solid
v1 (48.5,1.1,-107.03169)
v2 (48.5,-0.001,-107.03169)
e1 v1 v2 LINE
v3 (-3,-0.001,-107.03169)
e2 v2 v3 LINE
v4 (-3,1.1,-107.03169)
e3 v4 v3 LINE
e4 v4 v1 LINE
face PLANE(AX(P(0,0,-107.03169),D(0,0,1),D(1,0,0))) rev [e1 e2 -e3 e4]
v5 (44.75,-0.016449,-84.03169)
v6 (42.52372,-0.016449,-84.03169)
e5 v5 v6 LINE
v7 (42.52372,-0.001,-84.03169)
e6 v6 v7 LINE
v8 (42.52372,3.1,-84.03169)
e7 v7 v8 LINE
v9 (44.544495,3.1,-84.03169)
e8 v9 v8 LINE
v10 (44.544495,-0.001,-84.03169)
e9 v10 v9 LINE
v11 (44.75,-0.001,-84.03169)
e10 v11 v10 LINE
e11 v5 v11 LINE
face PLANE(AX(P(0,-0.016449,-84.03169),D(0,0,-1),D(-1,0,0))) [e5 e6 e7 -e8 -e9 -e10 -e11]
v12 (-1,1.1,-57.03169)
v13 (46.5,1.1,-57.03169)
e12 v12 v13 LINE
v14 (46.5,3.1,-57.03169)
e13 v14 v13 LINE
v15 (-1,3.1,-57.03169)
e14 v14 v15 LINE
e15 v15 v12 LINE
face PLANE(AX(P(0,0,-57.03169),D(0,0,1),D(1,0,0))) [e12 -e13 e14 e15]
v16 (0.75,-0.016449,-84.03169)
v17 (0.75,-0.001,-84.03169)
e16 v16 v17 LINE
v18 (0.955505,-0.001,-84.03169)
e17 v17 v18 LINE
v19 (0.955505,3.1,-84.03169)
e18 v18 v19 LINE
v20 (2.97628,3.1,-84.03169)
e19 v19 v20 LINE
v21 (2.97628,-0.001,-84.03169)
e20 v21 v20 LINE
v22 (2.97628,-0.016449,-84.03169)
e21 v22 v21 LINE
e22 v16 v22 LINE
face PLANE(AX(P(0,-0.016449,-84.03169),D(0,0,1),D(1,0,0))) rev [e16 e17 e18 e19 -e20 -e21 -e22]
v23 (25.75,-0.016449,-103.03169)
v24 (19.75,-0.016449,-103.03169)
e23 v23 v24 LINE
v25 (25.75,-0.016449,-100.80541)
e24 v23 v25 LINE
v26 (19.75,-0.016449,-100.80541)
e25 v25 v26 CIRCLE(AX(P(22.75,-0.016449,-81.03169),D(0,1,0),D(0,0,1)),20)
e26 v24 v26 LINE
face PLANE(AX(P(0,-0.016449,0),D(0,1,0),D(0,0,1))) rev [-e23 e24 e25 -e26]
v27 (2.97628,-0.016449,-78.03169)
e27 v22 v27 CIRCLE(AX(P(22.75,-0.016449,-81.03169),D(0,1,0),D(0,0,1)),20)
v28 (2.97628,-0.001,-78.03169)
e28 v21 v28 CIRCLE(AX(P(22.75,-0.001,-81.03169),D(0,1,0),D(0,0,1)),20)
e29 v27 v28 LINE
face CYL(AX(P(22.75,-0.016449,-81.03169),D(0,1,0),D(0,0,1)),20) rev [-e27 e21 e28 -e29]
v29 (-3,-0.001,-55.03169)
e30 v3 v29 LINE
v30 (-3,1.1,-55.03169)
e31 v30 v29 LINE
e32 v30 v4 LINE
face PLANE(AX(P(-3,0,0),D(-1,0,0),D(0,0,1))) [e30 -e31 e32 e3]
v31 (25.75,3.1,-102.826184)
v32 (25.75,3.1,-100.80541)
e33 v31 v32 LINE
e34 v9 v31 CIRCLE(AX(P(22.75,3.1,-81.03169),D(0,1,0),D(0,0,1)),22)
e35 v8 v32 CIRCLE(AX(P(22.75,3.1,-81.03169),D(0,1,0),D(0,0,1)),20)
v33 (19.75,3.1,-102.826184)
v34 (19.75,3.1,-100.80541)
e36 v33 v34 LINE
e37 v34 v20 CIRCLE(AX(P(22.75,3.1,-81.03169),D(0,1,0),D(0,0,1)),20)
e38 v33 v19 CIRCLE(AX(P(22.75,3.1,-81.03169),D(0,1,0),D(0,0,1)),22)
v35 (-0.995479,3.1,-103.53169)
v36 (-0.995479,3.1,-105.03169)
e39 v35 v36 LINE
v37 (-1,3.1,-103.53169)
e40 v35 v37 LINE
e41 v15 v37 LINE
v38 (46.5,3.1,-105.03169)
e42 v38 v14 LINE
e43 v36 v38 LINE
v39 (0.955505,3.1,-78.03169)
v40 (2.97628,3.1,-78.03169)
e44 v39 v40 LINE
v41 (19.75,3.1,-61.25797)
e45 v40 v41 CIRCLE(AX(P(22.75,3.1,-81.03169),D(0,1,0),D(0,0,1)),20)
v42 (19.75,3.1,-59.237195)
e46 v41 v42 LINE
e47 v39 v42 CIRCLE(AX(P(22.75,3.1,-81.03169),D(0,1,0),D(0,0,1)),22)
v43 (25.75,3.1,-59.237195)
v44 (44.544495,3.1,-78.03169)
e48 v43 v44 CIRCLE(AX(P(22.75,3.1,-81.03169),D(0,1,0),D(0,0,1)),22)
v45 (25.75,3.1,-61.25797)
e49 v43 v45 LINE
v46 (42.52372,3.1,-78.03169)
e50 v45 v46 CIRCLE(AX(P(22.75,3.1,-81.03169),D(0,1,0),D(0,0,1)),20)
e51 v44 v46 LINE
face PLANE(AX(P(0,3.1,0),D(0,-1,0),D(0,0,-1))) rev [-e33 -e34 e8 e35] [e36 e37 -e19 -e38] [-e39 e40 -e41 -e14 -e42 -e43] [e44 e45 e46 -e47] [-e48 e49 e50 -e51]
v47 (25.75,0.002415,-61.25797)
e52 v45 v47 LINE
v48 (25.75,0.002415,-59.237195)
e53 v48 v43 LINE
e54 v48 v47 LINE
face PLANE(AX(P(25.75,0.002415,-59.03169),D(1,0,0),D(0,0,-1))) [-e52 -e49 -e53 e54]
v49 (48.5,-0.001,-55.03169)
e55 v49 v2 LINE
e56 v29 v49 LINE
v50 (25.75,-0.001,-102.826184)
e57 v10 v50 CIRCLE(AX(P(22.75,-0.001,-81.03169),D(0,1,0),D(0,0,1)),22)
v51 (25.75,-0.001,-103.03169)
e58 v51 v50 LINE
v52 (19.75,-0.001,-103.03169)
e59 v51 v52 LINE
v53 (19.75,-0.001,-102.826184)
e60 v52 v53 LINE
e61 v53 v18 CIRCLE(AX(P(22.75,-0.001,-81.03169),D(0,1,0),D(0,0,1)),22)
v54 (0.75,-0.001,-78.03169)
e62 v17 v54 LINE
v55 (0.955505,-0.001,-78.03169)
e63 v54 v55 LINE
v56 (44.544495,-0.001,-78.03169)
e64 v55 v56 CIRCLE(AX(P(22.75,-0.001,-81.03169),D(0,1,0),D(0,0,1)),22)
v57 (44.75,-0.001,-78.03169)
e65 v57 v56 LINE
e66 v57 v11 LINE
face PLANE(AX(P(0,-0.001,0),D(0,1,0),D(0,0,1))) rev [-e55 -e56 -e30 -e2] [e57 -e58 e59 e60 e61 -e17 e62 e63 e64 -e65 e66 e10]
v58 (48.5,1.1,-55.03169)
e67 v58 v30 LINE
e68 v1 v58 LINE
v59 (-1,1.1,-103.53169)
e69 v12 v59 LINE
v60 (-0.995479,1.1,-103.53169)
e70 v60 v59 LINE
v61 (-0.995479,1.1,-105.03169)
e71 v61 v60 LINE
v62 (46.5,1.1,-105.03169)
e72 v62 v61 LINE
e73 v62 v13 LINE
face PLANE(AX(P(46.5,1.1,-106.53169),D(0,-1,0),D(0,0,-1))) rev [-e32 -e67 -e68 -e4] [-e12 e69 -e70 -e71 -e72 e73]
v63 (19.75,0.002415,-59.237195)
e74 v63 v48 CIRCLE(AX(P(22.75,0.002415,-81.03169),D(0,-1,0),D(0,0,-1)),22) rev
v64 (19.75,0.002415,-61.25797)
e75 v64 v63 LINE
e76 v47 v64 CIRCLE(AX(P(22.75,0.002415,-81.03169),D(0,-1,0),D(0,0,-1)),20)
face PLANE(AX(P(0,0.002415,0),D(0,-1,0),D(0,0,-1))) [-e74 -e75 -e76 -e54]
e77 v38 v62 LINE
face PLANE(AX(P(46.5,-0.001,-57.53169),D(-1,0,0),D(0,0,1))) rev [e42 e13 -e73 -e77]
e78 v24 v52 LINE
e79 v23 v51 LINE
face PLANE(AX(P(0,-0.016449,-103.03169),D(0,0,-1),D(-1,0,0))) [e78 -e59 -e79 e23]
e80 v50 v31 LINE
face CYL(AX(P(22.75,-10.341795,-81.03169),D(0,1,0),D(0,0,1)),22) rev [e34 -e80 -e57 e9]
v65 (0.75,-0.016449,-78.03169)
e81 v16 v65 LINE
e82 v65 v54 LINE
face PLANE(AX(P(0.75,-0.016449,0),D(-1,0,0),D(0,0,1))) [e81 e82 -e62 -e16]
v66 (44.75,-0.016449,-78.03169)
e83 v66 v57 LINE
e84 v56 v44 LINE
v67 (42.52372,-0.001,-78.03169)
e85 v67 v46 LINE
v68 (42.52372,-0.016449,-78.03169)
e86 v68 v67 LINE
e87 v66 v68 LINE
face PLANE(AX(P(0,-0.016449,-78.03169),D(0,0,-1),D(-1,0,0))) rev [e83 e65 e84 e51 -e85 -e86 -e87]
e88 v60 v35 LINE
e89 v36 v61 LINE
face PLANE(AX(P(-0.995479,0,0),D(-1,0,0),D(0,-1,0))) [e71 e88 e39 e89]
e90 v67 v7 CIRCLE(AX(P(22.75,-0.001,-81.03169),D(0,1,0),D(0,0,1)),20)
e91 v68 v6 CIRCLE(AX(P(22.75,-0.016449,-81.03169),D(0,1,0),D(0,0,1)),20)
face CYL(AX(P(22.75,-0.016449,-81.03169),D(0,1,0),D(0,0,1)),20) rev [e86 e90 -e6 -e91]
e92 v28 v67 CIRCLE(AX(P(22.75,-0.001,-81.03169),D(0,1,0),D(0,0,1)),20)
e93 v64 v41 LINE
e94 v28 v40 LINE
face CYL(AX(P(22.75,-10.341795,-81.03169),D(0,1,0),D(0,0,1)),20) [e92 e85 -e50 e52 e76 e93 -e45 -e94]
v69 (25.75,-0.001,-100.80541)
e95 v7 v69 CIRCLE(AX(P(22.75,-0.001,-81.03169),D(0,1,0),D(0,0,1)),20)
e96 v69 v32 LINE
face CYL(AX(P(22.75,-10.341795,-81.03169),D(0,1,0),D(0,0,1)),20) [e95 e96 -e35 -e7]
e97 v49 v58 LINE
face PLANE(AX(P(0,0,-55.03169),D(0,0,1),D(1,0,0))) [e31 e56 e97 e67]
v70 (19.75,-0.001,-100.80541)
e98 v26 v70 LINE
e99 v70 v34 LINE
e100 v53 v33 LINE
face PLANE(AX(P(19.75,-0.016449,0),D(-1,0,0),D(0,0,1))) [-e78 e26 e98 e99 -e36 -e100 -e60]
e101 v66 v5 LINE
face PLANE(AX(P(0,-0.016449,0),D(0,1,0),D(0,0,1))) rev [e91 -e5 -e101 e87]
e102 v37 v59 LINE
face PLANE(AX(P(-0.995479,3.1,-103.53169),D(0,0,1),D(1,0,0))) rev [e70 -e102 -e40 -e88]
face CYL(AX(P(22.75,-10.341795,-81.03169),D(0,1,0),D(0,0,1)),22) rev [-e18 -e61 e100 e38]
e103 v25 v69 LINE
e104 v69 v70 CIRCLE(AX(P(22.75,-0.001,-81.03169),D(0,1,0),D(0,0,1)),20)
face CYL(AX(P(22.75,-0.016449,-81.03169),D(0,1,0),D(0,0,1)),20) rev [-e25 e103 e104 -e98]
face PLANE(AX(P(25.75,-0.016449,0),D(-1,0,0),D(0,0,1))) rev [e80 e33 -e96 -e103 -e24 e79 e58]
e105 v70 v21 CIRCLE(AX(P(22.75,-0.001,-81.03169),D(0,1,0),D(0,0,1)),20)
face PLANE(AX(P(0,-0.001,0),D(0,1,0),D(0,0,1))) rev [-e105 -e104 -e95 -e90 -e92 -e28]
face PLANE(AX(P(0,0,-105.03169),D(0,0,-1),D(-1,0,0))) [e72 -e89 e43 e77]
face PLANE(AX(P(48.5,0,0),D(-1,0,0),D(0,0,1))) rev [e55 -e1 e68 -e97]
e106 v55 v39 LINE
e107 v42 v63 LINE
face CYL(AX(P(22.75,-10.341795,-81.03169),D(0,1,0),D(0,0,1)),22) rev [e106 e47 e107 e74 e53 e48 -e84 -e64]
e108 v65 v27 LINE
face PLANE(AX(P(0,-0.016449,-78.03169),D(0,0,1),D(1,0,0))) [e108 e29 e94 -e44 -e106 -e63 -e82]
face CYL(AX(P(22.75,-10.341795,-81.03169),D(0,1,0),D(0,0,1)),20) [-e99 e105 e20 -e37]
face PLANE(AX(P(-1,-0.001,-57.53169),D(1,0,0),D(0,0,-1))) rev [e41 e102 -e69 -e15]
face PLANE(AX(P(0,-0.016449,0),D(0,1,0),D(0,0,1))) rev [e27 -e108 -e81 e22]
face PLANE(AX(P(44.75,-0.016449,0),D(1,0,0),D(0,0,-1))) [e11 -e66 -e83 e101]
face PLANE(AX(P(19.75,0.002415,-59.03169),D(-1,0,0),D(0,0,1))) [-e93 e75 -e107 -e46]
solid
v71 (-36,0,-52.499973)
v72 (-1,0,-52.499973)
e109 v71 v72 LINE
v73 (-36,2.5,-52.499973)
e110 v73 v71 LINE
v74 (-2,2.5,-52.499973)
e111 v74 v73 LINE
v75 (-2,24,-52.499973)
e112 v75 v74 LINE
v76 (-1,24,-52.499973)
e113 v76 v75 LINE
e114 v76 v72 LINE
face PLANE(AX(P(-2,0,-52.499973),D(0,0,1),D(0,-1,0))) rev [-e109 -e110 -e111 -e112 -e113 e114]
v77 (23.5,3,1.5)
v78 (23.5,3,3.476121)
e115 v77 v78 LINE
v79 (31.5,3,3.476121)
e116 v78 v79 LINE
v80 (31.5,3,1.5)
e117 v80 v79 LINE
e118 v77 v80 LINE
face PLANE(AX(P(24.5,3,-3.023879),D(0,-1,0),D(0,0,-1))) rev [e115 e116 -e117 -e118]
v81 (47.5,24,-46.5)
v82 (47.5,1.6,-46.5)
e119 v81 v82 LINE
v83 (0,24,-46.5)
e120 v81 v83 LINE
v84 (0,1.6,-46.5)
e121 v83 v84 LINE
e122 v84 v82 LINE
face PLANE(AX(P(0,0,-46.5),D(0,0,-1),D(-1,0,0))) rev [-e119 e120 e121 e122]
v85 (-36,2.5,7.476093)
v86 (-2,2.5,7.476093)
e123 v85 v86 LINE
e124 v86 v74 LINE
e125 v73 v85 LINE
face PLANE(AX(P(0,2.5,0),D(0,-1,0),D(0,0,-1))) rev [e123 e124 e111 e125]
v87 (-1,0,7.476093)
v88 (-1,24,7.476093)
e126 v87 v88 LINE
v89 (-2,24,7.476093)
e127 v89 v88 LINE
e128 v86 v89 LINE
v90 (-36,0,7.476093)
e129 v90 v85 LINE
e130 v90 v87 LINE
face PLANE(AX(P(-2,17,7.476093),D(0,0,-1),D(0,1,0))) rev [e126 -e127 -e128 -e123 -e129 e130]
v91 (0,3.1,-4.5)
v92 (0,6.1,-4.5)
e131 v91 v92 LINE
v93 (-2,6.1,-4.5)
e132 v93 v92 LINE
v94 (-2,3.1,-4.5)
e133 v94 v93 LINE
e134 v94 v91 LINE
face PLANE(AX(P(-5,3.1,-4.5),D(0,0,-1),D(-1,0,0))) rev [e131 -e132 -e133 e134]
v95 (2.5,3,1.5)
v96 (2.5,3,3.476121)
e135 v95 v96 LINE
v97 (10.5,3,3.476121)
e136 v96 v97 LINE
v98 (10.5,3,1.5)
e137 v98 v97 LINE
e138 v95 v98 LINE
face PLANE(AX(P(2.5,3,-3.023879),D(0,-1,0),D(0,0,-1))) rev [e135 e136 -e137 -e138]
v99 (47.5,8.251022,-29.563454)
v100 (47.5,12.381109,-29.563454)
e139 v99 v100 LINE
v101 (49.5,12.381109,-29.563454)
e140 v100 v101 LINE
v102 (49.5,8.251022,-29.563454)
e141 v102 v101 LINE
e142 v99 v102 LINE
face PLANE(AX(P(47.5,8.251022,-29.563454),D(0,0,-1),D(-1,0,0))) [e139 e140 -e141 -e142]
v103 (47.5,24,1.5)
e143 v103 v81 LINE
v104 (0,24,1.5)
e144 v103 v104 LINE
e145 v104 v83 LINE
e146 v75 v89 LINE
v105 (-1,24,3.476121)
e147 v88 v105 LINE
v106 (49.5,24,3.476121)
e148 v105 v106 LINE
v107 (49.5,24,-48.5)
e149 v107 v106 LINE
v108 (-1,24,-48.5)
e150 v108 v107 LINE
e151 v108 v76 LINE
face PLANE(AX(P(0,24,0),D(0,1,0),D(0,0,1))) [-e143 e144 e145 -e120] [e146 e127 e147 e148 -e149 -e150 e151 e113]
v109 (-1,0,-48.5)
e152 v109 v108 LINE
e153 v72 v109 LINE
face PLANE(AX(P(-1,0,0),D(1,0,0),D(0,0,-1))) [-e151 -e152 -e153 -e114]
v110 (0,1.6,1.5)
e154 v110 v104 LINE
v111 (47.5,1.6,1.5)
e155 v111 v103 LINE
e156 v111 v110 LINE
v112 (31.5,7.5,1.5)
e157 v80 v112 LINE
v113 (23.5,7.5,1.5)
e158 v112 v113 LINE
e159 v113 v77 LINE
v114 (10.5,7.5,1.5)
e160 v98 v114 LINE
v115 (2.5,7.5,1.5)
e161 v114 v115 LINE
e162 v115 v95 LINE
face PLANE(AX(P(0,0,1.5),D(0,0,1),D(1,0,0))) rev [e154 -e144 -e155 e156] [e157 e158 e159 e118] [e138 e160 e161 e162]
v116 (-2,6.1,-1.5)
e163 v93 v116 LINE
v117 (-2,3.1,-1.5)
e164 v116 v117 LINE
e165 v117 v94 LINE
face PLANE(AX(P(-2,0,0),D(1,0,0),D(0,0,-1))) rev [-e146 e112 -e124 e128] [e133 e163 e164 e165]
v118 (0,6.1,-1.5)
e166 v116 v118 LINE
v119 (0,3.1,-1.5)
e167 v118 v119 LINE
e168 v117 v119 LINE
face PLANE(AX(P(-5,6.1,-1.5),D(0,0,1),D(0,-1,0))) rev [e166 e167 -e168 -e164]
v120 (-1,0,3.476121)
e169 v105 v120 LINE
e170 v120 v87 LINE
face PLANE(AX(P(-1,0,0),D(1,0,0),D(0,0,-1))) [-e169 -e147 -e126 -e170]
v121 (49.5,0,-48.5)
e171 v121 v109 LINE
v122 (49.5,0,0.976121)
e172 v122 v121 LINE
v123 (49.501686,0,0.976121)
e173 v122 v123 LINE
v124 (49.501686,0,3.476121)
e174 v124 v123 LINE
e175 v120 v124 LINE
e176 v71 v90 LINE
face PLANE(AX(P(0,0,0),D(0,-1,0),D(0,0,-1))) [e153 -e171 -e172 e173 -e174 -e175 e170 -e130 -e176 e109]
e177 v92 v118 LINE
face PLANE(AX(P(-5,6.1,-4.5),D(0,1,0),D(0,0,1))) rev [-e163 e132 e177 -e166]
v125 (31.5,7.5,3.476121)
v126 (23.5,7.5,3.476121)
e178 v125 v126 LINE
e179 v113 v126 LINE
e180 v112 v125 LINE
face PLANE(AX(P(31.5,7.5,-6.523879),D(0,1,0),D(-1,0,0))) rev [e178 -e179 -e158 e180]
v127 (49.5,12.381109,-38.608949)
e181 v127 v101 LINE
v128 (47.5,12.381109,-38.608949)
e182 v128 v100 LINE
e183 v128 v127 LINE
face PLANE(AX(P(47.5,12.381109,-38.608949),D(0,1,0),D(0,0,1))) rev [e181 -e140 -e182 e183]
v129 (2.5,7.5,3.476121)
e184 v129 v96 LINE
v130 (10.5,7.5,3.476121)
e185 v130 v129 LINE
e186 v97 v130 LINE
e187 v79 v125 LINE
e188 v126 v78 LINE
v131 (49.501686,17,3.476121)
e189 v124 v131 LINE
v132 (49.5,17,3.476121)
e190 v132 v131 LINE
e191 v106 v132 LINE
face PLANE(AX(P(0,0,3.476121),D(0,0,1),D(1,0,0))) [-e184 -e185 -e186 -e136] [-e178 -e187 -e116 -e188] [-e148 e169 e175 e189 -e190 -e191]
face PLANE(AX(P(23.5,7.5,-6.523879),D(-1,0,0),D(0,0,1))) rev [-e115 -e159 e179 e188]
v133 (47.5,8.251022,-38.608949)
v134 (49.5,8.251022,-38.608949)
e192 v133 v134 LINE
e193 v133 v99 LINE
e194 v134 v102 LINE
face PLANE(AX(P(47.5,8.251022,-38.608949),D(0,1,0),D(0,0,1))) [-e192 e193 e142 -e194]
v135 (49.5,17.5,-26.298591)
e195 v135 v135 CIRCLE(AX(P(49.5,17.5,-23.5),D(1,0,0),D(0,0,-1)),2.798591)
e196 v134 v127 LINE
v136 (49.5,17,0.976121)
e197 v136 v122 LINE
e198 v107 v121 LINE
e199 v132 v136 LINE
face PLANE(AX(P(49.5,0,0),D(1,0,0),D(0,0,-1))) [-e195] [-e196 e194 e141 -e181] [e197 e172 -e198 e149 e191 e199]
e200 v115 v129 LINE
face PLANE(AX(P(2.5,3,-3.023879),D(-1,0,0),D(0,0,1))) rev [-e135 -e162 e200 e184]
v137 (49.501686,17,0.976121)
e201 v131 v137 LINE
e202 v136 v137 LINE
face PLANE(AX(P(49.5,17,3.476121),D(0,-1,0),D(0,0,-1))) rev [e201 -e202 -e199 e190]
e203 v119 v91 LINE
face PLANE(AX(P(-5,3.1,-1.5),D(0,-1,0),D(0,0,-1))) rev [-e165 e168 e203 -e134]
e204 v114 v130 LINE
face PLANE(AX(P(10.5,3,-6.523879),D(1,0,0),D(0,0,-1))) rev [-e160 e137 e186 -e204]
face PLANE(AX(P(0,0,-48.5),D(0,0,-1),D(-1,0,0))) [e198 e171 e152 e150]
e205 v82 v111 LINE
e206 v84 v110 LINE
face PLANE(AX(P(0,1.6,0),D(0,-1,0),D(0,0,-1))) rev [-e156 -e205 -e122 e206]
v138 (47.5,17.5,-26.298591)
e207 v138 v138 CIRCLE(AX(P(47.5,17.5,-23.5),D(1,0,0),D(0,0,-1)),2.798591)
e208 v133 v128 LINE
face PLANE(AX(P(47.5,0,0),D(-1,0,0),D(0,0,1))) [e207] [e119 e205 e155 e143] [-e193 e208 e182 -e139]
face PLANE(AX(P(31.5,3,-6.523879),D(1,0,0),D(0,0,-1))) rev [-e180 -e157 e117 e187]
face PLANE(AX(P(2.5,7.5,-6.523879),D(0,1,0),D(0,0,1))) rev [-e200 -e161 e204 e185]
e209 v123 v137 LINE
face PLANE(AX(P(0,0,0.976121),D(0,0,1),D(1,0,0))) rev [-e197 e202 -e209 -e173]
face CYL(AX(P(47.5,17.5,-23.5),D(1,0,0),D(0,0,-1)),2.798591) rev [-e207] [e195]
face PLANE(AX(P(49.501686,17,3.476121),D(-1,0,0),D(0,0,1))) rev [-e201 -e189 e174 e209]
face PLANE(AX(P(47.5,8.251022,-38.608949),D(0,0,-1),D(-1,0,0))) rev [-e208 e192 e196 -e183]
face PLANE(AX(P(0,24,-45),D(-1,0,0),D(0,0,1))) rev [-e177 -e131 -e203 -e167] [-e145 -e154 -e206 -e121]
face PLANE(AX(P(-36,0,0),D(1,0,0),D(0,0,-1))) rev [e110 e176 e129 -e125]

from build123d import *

# Parameters (mm, degrees)
SKETCH1_W                = 45.5
SKETCH1_H                = 45
BOSS_EXTRUDE1_DEPTH      = 1.6
SKETCH2_W                = 45.5
SKETCH2_H                = 45
BOSS_EXTRUDE2_DEPTH      = 24
SKETCH4_W                = 4
SKETCH4_H                = 1.7
CUT_EXTRUDE1_DEPTH       = 1.1
CUT_EXTRUDE3_DEPTH       = 1.1
SKETCH10_R               = 2.5079963
CUT_EXTRUDE4_DEPTH       = 1.1
BOSS_EXTRUDE3_DEPTH      = 0.001
BOSS_EXTRUDE3_DEPTH_BACK = 1.1
SKETCH11_W               = 47.5
SKETCH11_H               = 47
SKETCH13_W               = 45.5
SKETCH13_H               = 45
BOSS_EXTRUDE4_DEPTH      = 2
SKETCH14_R               = 22
SKETCH14_R_2             = 20
CUT_EXTRUDE6_DEPTH       = 13.441794669
SKETCH15_W               = 6
SKETCH15_H               = 7.443647067
BOSS_EXTRUDE6_DEPTH      = 3.097585302
BOSS_EXTRUDE10_DEPTH     = 3.116449364
BOSS_EXTRUDE11_DEPTH     = 1
SKETCH22_W               = 59.97606594
SKETCH22_H               = 1
BOSS_EXTRUDE12_DEPTH     = 34
CUT_EXTRUDE7_DEPTH       = 1.1
SKETCH23_W               = 3
SKETCH23_H               = 3
CUT_EXTRUDE8_DEPTH       = 5
SKETCH24_W               = 46.976120504
SKETCH24_H               = 24
BOSS_EXTRUDE13_DEPTH     = 3
SKETCH25_W               = 50.501685611
SKETCH25_H               = 17
BOSS_EXTRUDE14_DEPTH     = 2.5
SKETCH26_W               = 50.5
SKETCH26_H               = 24
BOSS_EXTRUDE15_DEPTH     = 2.5
SKETCH27_W               = 45.5
SKETCH27_H               = 22.4
CUT_EXTRUDE9_DEPTH       = 1.5
SKETCH28_W               = 45.5
SKETCH28_H               = 22.4
CUT_EXTRUDE10_DEPTH      = 1.5
CUT_EXTRUDE13_START      = -12.5
SKETCH31_R               = 2.5079963
SKETCH31_W               = 8
SKETCH31_H               = 3.5
CUT_EXTRUDE13_DEPTH      = 12.5
SKETCH32_W               = 48
SKETCH32_H               = 22.4
CUT_EXTRUDE14_DEPTH      = 2
SKETCH34_W               = 34
SKETCH34_H               = 59.97606594
BOSS_EXTRUDE16_DEPTH     = 1.5
SKETCH35_W               = 6
SKETCH35_H               = 3
CUT_EXTRUDE15_DEPTH      = 6.5
BOSS_EXTRUDE18_DEPTH     = 7
SKETCH47_W               = 45
SKETCH47_H               = 2
BOSS_EXTRUDE19_DEPTH     = 1
SKETCH49_W               = 45
SKETCH49_H               = 2
BOSS_EXTRUDE20_DEPTH     = 1
SKETCH51_W               = 48.225479337
SKETCH51_H               = 2
BOSS_EXTRUDE21_DEPTH     = 1.5
SKETCH53_W               = 48
SKETCH53_H               = 2
BOSS_EXTRUDE22_DEPTH     = 1.5
SKETCH54_W               = 47.5
SKETCH54_H               = 1.101
BOSS_EXTRUDE23_DEPTH     = 2
SKETCH55_W               = 49
SKETCH55_H               = 1.101
BOSS_EXTRUDE24_DEPTH     = 2
SKETCH56_W               = 49
SKETCH56_H               = 1.101
BOSS_EXTRUDE25_DEPTH     = 2
SKETCH57_W               = 51.5
SKETCH57_H               = 1.101
BOSS_EXTRUDE26_DEPTH     = 2
SKETCH58_W               = 51
SKETCH58_H               = 1.101
BOSS_EXTRUDE27_DEPTH     = 0.5
SKETCH59_W               = 51
SKETCH59_H               = 1.101
BOSS_EXTRUDE28_DEPTH     = 0.5
CUT_EXTRUDE29_START      = -0.5
CUT_EXTRUDE29_OUTLINE_W  = 51
CUT_EXTRUDE29_OUTLINE_H  = 1.101
CUT_EXTRUDE29_DEPTH      = 0.5
SKETCH64_W               = 52
SKETCH64_H               = 1.101
BOSS_EXTRUDE30_DEPTH     = 0.5
CUT_EXTRUDE31_START      = -0.5
CUT_EXTRUDE31_OUTLINE_W  = 51.5
CUT_EXTRUDE31_OUTLINE_H  = 1.101
CUT_EXTRUDE31_DEPTH      = 0.5
SKETCH66_W               = 51.5
SKETCH66_H               = 1.101
BOSS_EXTRUDE32_DEPTH     = 0.5
SKETCH67_W               = 8
SKETCH67_H               = 4.5
CUT_EXTRUDE16_DEPTH      = 10
BOSS_EXTRUDE34_START     = -2
SKETCH70_R               = 2.5079963
BOSS_EXTRUDE34_DEPTH     = 2
SKETCH69_R               = 2.798591497
CUT_EXTRUDE17_DEPTH      = 2
SKETCH80_W               = 8
SKETCH80_H               = 3.5
BOSS_EXTRUDE36_DEPTH     = 1
SKETCH80_2_W             = 8
SKETCH80_2_H             = 3.5
BOSS_EXTRUDE37_DEPTH     = 2
SKETCH80_3_W             = 8
SKETCH80_3_H             = 3.5
CUT_EXTRUDE34_DEPTH      = 2
SKETCH83_W               = 2.5
SKETCH83_H               = 7
CUT_EXTRUDE35_DEPTH      = 2
SKETCH77_W               = 9.045495133
SKETCH77_H               = 4.130087626
CUT_EXTRUDE36_DEPTH      = 2
SKETCH84_W               = 8.684162812
SKETCH84_H               = 3.956527075
BOSS_EXTRUDE38_DEPTH     = 2
SKETCH87_W               = 1.5
SKETCH87_H               = 2
CUT_EXTRUDE38_DEPTH      = 0.73
SKETCH89_W               = 1.5
SKETCH89_H               = 2
CUT_EXTRUDE39_DEPTH      = 0.5


# Read off the part's stored shape, not the designer's step: Cut-Extrude29, Cut-Extrude31
with BuildPart() as part:
    # Sketch1 → Boss-Extrude1 (new body)
    with BuildSketch(Plane(origin=(0, 0, 0), x_dir=(1, 0, 0), z_dir=(0, 1, 0))):
        with Locations((22.75, 22.5)):
            Rectangle(SKETCH1_W, SKETCH1_H)
    extrude(amount=BOSS_EXTRUDE1_DEPTH)

    # Sketch2 → Boss-Extrude2 (add)
    with BuildSketch(Plane.XZ):
        Polygon((0, -46), (46.5, -46), (46.5, -45), (46.5, 0), (46.5, 0.976120504), (0, 0.976120504), (-1, 0.976120504), (-1, -46), align=None)
        with Locations((22.75, -22.5)):
            Rectangle(SKETCH2_W, SKETCH2_H, mode=Mode.SUBTRACT)
    extrude(amount=-BOSS_EXTRUDE2_DEPTH)

    # Sketch4 → Cut-Extrude1 (cut)
    with BuildSketch(Plane.XY.offset(0.976120504)):
        with Locations((4, 3.85)):
            Rectangle(SKETCH4_W, SKETCH4_H)
        with Locations((25, 3.85)):
            Rectangle(SKETCH4_W, SKETCH4_H)
    extrude(amount=-CUT_EXTRUDE1_DEPTH, mode=Mode.SUBTRACT)

    # Sketch9 → Cut-Extrude3 (cut)
    with BuildSketch(Plane(origin=(46.5, 0, 0), x_dir=(0, 0, -1), z_dir=(1, 0, 0))):
        Polygon((36, 4.5), (39.355507427, 4.5), (39.355507427, 8), (31.355507427, 8), (31.355507427, 4.5), align=None)
    extrude(amount=-CUT_EXTRUDE3_DEPTH, mode=Mode.SUBTRACT)

    # Sketch10 → Cut-Extrude4 (cut)
    with BuildSketch(Plane(origin=(46.5, 0, 0), x_dir=(0, 0, -1), z_dir=(1, 0, 0))):
        with Locations((24.5, 13.5)):
            Circle(SKETCH10_R)
    extrude(amount=-CUT_EXTRUDE4_DEPTH, mode=Mode.SUBTRACT)

    # Sketch21 → Boss-Extrude11 (add)
    with BuildSketch(Plane.ZY.offset(1)):
        Polygon((-46, 0), (-52.499972718, 0), (-52.499972718, 17), (7.476093222, 17), (7.476093222, 0), (0.976120504, 0), align=None)
    extrude(amount=BOSS_EXTRUDE11_DEPTH)

    # Sketch22 → Boss-Extrude12 (add)
    with BuildSketch(Plane.ZY.offset(2)):
        with Locations((-22.511939748, 0.5)):
            Rectangle(SKETCH22_W, SKETCH22_H)
    extrude(amount=BOSS_EXTRUDE12_DEPTH)

    # Sketch6 → Cut-Extrude7 (cut)
    with BuildSketch(Plane.XY.offset(0.976120504)):
        Polygon((15, 3), (17.895490388, 3), (17.895490388, 4.5), (12.317203257, 4.5), (12.317203257, 3), align=None)
    extrude(amount=-CUT_EXTRUDE7_DEPTH, mode=Mode.SUBTRACT)

    # Sketch23 → Cut-Extrude8 (cut)
    with BuildSketch(Plane(origin=(0, 0, 0), x_dir=(0, 0, -1), z_dir=(1, 0, 0))):
        with Locations((3, 4.6)):
            Rectangle(SKETCH23_W, SKETCH23_H)
    extrude(amount=-CUT_EXTRUDE8_DEPTH, mode=Mode.SUBTRACT)

    # Sketch24 → Boss-Extrude13 (add)
    with BuildSketch(Plane(origin=(46.5, 0, 0), x_dir=(0, 0, -1), z_dir=(1, 0, 0))):
        with Locations((22.511939748, 12)):
            Rectangle(SKETCH24_W, SKETCH24_H)
    extrude(amount=BOSS_EXTRUDE13_DEPTH)

    # Sketch25 → Boss-Extrude14 (add)
    with BuildSketch(Plane.XY.offset(0.976120504)):
        with Locations((24.250842806, 8.5)):
            Rectangle(SKETCH25_W, SKETCH25_H)
    extrude(amount=BOSS_EXTRUDE14_DEPTH)

    # Sketch26 → Boss-Extrude15 (add)
    with BuildSketch(Plane(origin=(0, 0, -46), x_dir=(-1, 0, 0), z_dir=(0, 0, -1))):
        with Locations((-24.25, 12)):
            Rectangle(SKETCH26_W, SKETCH26_H)
    extrude(amount=BOSS_EXTRUDE15_DEPTH)

    # Sketch27 → Cut-Extrude9 (cut)
    with BuildSketch(Plane.XY.offset(-45)):
        with Locations((22.75, 12.8)):
            Rectangle(SKETCH27_W, SKETCH27_H)
    extrude(amount=-CUT_EXTRUDE9_DEPTH, mode=Mode.SUBTRACT)

    # Sketch28 → Cut-Extrude10 (cut)
    with BuildSketch(Plane(origin=(0, 0, 0), x_dir=(-1, 0, 0), z_dir=(0, 0, -1))):
        with Locations((-22.75, 12.8)):
            Rectangle(SKETCH28_W, SKETCH28_H)
    extrude(amount=-CUT_EXTRUDE10_DEPTH, mode=Mode.SUBTRACT)

    # Sketch31 → Cut-Extrude13 (cut)
    with BuildSketch(Plane.ZY.offset(-46.5).offset(CUT_EXTRUDE13_START)):
        with Locations(Location((-24.5, 13.5, 0), (0, 0, 180))):
            Circle(SKETCH31_R)
        with Locations((-35.355507427, 6.25)):
            Rectangle(SKETCH31_W, SKETCH31_H)
    extrude(amount=CUT_EXTRUDE13_DEPTH, mode=Mode.SUBTRACT)

    # Sketch32 → Cut-Extrude14 (cut)
    with BuildSketch(Plane.ZY.offset(-45.5)):
        with Locations((-22.5, 12.8)):
            Rectangle(SKETCH32_W, SKETCH32_H)
    extrude(amount=-CUT_EXTRUDE14_DEPTH, mode=Mode.SUBTRACT)

    # Sketch34 → Boss-Extrude16 (add)
    with BuildSketch(Plane(origin=(0, 1, 0), x_dir=(1, 0, 0), z_dir=(0, 1, 0))):
        with Locations((-19, 22.511939748)):
            Rectangle(SKETCH34_W, SKETCH34_H)
    extrude(amount=BOSS_EXTRUDE16_DEPTH)

    # Sketch35 → Cut-Extrude15 (cut)
    with BuildSketch(Plane.XY.offset(3.476120504)):
        with Locations((5.5, 4.5)):
            Rectangle(SKETCH35_W, SKETCH35_H)
        with Locations((27.5, 4.5)):
            Rectangle(SKETCH35_W, SKETCH35_H)
    extrude(amount=-CUT_EXTRUDE15_DEPTH, mode=Mode.SUBTRACT)

    # Sketch39 → Boss-Extrude18 (add)
    with BuildSketch(Plane(origin=(0, 17, 0), x_dir=(1, 0, 0), z_dir=(0, 1, 0))):
        Polygon((-2, -7.476093222), (-1, -7.476093222), (-1, -3.476120504), (51.5, -3.476120504), (51.5, -0.976120504), (47.5, -0.976120504), (47.5, -1.5), (0, -1.5), (0, -0.976120504), (-1, -0.976120504), (-1, 52.499972718), (-2, 52.499972718), align=None)
    extrude(amount=BOSS_EXTRUDE18_DEPTH)

    # Sketch67 → Cut-Extrude16 (cut)
    with BuildSketch(Plane.XY.offset(3.476120504)):
        Polygon((27.5, 3), (23.5, 3), (23.5, 7.5), (31.5, 7.5), (31.5, 3), align=None)
        with Locations((6.5, 5.25)):
            Rectangle(SKETCH67_W, SKETCH67_H)
    extrude(amount=-CUT_EXTRUDE16_DEPTH, mode=Mode.SUBTRACT)

    # Sketch70 → Boss-Extrude34 (add)
    with BuildSketch(Plane(origin=(49.5, 0, 0), x_dir=(0, 0, -1), z_dir=(1, 0, 0)).offset(BOSS_EXTRUDE34_START)):
        with Locations((24.5, 13.5)):
            Circle(SKETCH70_R)
    extrude(amount=BOSS_EXTRUDE34_DEPTH)

    # Sketch69 → Cut-Extrude17 (cut)
    with BuildSketch(Plane(origin=(49.5, 0, 0), x_dir=(0, 0, -1), z_dir=(1, 0, 0))):
        with Locations((23.5, 17.5)):
            Circle(SKETCH69_R)
    extrude(amount=-CUT_EXTRUDE17_DEPTH, mode=Mode.SUBTRACT)

    # Sketch80 → Boss-Extrude36 (add)
    with BuildSketch(Plane(origin=(49.5, 0, 0), x_dir=(0, 0, -1), z_dir=(1, 0, 0))):
        with Locations((35.355507427, 6.25)):
            Rectangle(SKETCH80_W, SKETCH80_H)
    extrude(amount=-BOSS_EXTRUDE36_DEPTH)

    # Sketch80<2> → Boss-Extrude37 (add)
    with BuildSketch(Plane(origin=(49.5, 0, 0), x_dir=(0, 0, -1), z_dir=(1, 0, 0))):
        with Locations((35.355507427, 6.25)):
            Rectangle(SKETCH80_2_W, SKETCH80_2_H)
    extrude(amount=-BOSS_EXTRUDE37_DEPTH)

    # Sketch80<3> → Cut-Extrude34 (cut)
    with BuildSketch(Plane(origin=(49.5, 0, 0), x_dir=(0, 0, -1), z_dir=(1, 0, 0))):
        with Locations((35.355507427, 6.25)):
            Rectangle(SKETCH80_3_W, SKETCH80_3_H)
    extrude(amount=-CUT_EXTRUDE34_DEPTH, mode=Mode.SUBTRACT)

    # Sketch83 → Cut-Extrude35 (cut)
    with BuildSketch(Plane(origin=(51.5, 0, 0), x_dir=(0, 0, -1), z_dir=(1, 0, 0))):
        with Locations((-2.226120504, 20.5)):
            Rectangle(SKETCH83_W, SKETCH83_H)
    extrude(amount=-CUT_EXTRUDE35_DEPTH, mode=Mode.SUBTRACT)

    # Sketch77 → Cut-Extrude36 (cut)
    with BuildSketch(Plane(origin=(49.5, 0, 0), x_dir=(0, 0, -1), z_dir=(1, 0, 0))):
        with Locations((34.086201301, 10.316065325)):
            Rectangle(SKETCH77_W, SKETCH77_H)
    extrude(amount=-CUT_EXTRUDE36_DEPTH, mode=Mode.SUBTRACT)

    # Sketch84 → Boss-Extrude38 (add)
    with BuildSketch(Plane(origin=(49.5, 0, 0), x_dir=(0, 0, -1), z_dir=(1, 0, 0))):
        with Locations((35.013426021, 6.021736462)):
            Rectangle(SKETCH84_W, SKETCH84_H)
    extrude(amount=-BOSS_EXTRUDE38_DEPTH)


with BuildPart() as body_2:
    # Sketch11 → Boss-Extrude3 (new, two sides: drawn at the far end of the back side and taken through both)
    with BuildSketch(Plane.XZ.offset(-BOSS_EXTRUDE3_DEPTH_BACK)):
        with Locations((22.75, -81.03168978)):
            Rectangle(SKETCH11_W, SKETCH11_H)
    extrude(amount=BOSS_EXTRUDE3_DEPTH + BOSS_EXTRUDE3_DEPTH_BACK)

    # Sketch13 → Boss-Extrude4 (add)
    with BuildSketch(Plane(origin=(0, 1.1, 0), x_dir=(1, 0, 0), z_dir=(0, 1, 0))):
        with Locations((22.75, 81.03168978)):
            Rectangle(SKETCH13_W, SKETCH13_H)
    extrude(amount=BOSS_EXTRUDE4_DEPTH)

    # Sketch14 → Cut-Extrude6 (cut)
    with BuildSketch(Plane(origin=(0, 3.1, 0), x_dir=(1, 0, 0), z_dir=(0, 1, 0))):
        with Locations(Location((22.75, 81.03168978, 0), (0, 0, 270))):
            Circle(SKETCH14_R)
        with Locations(Location((22.75, 81.03168978, 0), (0, 0, 270))):
            Circle(SKETCH14_R_2, mode=Mode.SUBTRACT)
    extrude(amount=-CUT_EXTRUDE6_DEPTH, mode=Mode.SUBTRACT)


with BuildPart() as cut_extrude6_piece_1:
    # of the separate pieces the step leaves, piece 1, a body of its own (cut_extrude6_pieces)
    add(body_2.part.solids().sort_by_distance((22.75, -0.001, -61.03168978))[0])



with BuildPart() as cut_extrude6_piece_2:
    # of the separate pieces the step leaves, piece 2, a body of its own (cut_extrude6_pieces)
    add(body_2.part.solids().sort_by_distance((-1, -0.001, -57.53168978))[0])


with BuildPart() as cut_extrude6_piece_1_1:
    add(cut_extrude6_piece_1.part)

    add(cut_extrude6_piece_2.part)  # Boss-Extrude6 merges Cut-Extrude6 piece 2
    # Sketch15 → Boss-Extrude6 (add)
    with BuildSketch(Plane(origin=(0, 3.1, 0), x_dir=(1, 0, 0), z_dir=(0, 1, 0))):
        with Locations((22.75, 62.753513314)):
            Rectangle(SKETCH15_W, SKETCH15_H)
    extrude(amount=-BOSS_EXTRUDE6_DEPTH)

    # Sketch16 → Boss-Extrude10 (add)
    with BuildSketch(Plane(origin=(0, 3.1, 0), x_dir=(1, 0, 0), z_dir=(0, 1, 0))):
        with BuildLine():
            ThreePointArc((2.976280067, 78.03168978), (2.75, 81.03168978), (2.976280067, 84.03168978))
            Line((2.976280067, 84.03168978), (0.75, 84.03168978))
            Line((0.75, 84.03168978), (0.75, 81.03168978))
            Line((0.75, 81.03168978), (0.75, 78.03168978))
            Line((0.75, 78.03168978), (2.976280067, 78.03168978))
        make_face()
        with BuildLine():
            Line((25.75, 103.03168978), (22.75, 103.03168978))
            Line((22.75, 103.03168978), (19.75, 103.03168978))
            Line((19.75, 103.03168978), (19.75, 100.805409714))
            ThreePointArc((19.75, 100.805409714), (22.75, 101.03168978), (25.75, 100.805409714))
            Line((25.75, 100.805409714), (25.75, 103.03168978))
        make_face()
        with BuildLine():
            Line((44.75, 84.03168978), (42.523719933, 84.03168978))
            ThreePointArc((42.523719933, 84.03168978), (42.693349752, 82.535950618), (42.75, 81.03168978))
            ThreePointArc((42.75, 81.03168978), (42.693349752, 79.527428943), (42.523719933, 78.03168978))
            Line((42.523719933, 78.03168978), (44.75, 78.03168978))
            Line((44.75, 78.03168978), (44.75, 81.03168978))
            Line((44.75, 81.03168978), (44.75, 84.03168978))
        make_face()
    extrude(amount=-BOSS_EXTRUDE10_DEPTH)

    # Sketch47 → Boss-Extrude19 (add)
    with BuildSketch(Plane(origin=(45.5, 0, 0), x_dir=(0, 0, -1), z_dir=(1, 0, 0))):
        with Locations((81.03168978, 2.1)):
            Rectangle(SKETCH47_W, SKETCH47_H)
    extrude(amount=BOSS_EXTRUDE19_DEPTH)

    # Sketch49 → Boss-Extrude20 (add)
    with BuildSketch(Plane.ZY):
        with Locations((-81.03168978, 2.1)):
            Rectangle(SKETCH49_W, SKETCH49_H)
    extrude(amount=BOSS_EXTRUDE20_DEPTH)

    # Sketch51 → Boss-Extrude21 (add)
    with BuildSketch(Plane(origin=(0, 0, -103.53168978), x_dir=(-1, 0, 0), z_dir=(0, 0, -1))):
        with Locations((-22.387260331, 2.1)):
            Rectangle(SKETCH51_W, SKETCH51_H)
    extrude(amount=BOSS_EXTRUDE21_DEPTH)

    # Sketch53 → Boss-Extrude22 (add)
    with BuildSketch(Plane.XY.offset(-58.53168978)):
        with Locations((23, 2.1)):
            Rectangle(SKETCH53_W, SKETCH53_H)
    extrude(amount=BOSS_EXTRUDE22_DEPTH)

    # Sketch54 → Boss-Extrude23 (add)
    with BuildSketch(Plane(origin=(0, 0, -104.53168978), x_dir=(-1, 0, 0), z_dir=(0, 0, -1))):
        with Locations((-22.75, 0.5495)):
            Rectangle(SKETCH54_W, SKETCH54_H)
    extrude(amount=BOSS_EXTRUDE23_DEPTH)

    # Sketch55 → Boss-Extrude24 (add)
    with BuildSketch(Plane.ZY.offset(1)):
        with Locations((-82.03168978, 0.5495)):
            Rectangle(SKETCH55_W, SKETCH55_H)
    extrude(amount=BOSS_EXTRUDE24_DEPTH)

    # Sketch56 → Boss-Extrude25 (add)
    with BuildSketch(Plane(origin=(46.5, 0, 0), x_dir=(0, 0, -1), z_dir=(1, 0, 0))):
        with Locations((82.03168978, 0.5495)):
            Rectangle(SKETCH56_W, SKETCH56_H)
    extrude(amount=BOSS_EXTRUDE25_DEPTH)

    # Sketch57 → Boss-Extrude26 (add)
    with BuildSketch(Plane.XY.offset(-57.53168978)):
        with Locations((22.75, 0.5495)):
            Rectangle(SKETCH57_W, SKETCH57_H)
    extrude(amount=BOSS_EXTRUDE26_DEPTH)

    # Sketch58 → Boss-Extrude27 (add)
    with BuildSketch(Plane(origin=(48.5, 0, 0), x_dir=(0, 0, -1), z_dir=(1, 0, 0))):
        with Locations((81.03168978, 0.5495)):
            Rectangle(SKETCH58_W, SKETCH58_H)
    extrude(amount=BOSS_EXTRUDE27_DEPTH)

    # Sketch59 → Boss-Extrude28 (add)
    with BuildSketch(Plane.ZY.offset(3)):
        with Locations((-81.03168978, 0.5495)):
            Rectangle(SKETCH59_W, SKETCH59_H)
    extrude(amount=BOSS_EXTRUDE28_DEPTH)

    # Cut-Extrude29 outline → Cut-Extrude29 (cut)
    with BuildSketch(Plane(origin=(49, 0, 0), x_dir=(0, 0, -1), z_dir=(1, 0, 0)).offset(CUT_EXTRUDE29_START)):
        with Locations((81.03168978, 0.5495)):
            Rectangle(CUT_EXTRUDE29_OUTLINE_W, CUT_EXTRUDE29_OUTLINE_H)
    extrude(amount=CUT_EXTRUDE29_DEPTH, mode=Mode.SUBTRACT)

    # Sketch64 → Boss-Extrude30 (add)
    with BuildSketch(Plane(origin=(0, 0, -106.53168978), x_dir=(-1, 0, 0), z_dir=(0, 0, -1))):
        with Locations((-22.5, 0.5495)):
            Rectangle(SKETCH64_W, SKETCH64_H)
    extrude(amount=BOSS_EXTRUDE30_DEPTH)

    # Cut-Extrude31 outline → Cut-Extrude31 (cut)
    with BuildSketch(Plane.ZY.offset(3.5).offset(CUT_EXTRUDE31_START)):
        with Locations((-81.28168978, 0.5495)):
            Rectangle(CUT_EXTRUDE31_OUTLINE_W, CUT_EXTRUDE31_OUTLINE_H)
    extrude(amount=CUT_EXTRUDE31_DEPTH, mode=Mode.SUBTRACT)

    # Sketch66 → Boss-Extrude32 (add)
    with BuildSketch(Plane.XY.offset(-55.53168978)):
        with Locations((22.75, 0.5495)):
            Rectangle(SKETCH66_W, SKETCH66_H)
    extrude(amount=BOSS_EXTRUDE32_DEPTH)

    # Sketch87 → Cut-Extrude38 (cut)
    with BuildSketch(Plane.ZY.offset(1.725479337)):
        with Locations((-104.28168978, 2.1)):
            Rectangle(SKETCH87_W, SKETCH87_H)
    extrude(amount=-CUT_EXTRUDE38_DEPTH, mode=Mode.SUBTRACT)

    # Sketch89 → Cut-Extrude39 (cut)
    with BuildSketch(Plane(origin=(47, 0, 0), x_dir=(0, 0, -1), z_dir=(1, 0, 0))):
        with Locations((57.78168978, 2.1)):
            Rectangle(SKETCH89_W, SKETCH89_H)
    extrude(amount=-CUT_EXTRUDE39_DEPTH, mode=Mode.SUBTRACT)


solid = Compound([part.part, cut_extrude6_piece_1_1.part])
